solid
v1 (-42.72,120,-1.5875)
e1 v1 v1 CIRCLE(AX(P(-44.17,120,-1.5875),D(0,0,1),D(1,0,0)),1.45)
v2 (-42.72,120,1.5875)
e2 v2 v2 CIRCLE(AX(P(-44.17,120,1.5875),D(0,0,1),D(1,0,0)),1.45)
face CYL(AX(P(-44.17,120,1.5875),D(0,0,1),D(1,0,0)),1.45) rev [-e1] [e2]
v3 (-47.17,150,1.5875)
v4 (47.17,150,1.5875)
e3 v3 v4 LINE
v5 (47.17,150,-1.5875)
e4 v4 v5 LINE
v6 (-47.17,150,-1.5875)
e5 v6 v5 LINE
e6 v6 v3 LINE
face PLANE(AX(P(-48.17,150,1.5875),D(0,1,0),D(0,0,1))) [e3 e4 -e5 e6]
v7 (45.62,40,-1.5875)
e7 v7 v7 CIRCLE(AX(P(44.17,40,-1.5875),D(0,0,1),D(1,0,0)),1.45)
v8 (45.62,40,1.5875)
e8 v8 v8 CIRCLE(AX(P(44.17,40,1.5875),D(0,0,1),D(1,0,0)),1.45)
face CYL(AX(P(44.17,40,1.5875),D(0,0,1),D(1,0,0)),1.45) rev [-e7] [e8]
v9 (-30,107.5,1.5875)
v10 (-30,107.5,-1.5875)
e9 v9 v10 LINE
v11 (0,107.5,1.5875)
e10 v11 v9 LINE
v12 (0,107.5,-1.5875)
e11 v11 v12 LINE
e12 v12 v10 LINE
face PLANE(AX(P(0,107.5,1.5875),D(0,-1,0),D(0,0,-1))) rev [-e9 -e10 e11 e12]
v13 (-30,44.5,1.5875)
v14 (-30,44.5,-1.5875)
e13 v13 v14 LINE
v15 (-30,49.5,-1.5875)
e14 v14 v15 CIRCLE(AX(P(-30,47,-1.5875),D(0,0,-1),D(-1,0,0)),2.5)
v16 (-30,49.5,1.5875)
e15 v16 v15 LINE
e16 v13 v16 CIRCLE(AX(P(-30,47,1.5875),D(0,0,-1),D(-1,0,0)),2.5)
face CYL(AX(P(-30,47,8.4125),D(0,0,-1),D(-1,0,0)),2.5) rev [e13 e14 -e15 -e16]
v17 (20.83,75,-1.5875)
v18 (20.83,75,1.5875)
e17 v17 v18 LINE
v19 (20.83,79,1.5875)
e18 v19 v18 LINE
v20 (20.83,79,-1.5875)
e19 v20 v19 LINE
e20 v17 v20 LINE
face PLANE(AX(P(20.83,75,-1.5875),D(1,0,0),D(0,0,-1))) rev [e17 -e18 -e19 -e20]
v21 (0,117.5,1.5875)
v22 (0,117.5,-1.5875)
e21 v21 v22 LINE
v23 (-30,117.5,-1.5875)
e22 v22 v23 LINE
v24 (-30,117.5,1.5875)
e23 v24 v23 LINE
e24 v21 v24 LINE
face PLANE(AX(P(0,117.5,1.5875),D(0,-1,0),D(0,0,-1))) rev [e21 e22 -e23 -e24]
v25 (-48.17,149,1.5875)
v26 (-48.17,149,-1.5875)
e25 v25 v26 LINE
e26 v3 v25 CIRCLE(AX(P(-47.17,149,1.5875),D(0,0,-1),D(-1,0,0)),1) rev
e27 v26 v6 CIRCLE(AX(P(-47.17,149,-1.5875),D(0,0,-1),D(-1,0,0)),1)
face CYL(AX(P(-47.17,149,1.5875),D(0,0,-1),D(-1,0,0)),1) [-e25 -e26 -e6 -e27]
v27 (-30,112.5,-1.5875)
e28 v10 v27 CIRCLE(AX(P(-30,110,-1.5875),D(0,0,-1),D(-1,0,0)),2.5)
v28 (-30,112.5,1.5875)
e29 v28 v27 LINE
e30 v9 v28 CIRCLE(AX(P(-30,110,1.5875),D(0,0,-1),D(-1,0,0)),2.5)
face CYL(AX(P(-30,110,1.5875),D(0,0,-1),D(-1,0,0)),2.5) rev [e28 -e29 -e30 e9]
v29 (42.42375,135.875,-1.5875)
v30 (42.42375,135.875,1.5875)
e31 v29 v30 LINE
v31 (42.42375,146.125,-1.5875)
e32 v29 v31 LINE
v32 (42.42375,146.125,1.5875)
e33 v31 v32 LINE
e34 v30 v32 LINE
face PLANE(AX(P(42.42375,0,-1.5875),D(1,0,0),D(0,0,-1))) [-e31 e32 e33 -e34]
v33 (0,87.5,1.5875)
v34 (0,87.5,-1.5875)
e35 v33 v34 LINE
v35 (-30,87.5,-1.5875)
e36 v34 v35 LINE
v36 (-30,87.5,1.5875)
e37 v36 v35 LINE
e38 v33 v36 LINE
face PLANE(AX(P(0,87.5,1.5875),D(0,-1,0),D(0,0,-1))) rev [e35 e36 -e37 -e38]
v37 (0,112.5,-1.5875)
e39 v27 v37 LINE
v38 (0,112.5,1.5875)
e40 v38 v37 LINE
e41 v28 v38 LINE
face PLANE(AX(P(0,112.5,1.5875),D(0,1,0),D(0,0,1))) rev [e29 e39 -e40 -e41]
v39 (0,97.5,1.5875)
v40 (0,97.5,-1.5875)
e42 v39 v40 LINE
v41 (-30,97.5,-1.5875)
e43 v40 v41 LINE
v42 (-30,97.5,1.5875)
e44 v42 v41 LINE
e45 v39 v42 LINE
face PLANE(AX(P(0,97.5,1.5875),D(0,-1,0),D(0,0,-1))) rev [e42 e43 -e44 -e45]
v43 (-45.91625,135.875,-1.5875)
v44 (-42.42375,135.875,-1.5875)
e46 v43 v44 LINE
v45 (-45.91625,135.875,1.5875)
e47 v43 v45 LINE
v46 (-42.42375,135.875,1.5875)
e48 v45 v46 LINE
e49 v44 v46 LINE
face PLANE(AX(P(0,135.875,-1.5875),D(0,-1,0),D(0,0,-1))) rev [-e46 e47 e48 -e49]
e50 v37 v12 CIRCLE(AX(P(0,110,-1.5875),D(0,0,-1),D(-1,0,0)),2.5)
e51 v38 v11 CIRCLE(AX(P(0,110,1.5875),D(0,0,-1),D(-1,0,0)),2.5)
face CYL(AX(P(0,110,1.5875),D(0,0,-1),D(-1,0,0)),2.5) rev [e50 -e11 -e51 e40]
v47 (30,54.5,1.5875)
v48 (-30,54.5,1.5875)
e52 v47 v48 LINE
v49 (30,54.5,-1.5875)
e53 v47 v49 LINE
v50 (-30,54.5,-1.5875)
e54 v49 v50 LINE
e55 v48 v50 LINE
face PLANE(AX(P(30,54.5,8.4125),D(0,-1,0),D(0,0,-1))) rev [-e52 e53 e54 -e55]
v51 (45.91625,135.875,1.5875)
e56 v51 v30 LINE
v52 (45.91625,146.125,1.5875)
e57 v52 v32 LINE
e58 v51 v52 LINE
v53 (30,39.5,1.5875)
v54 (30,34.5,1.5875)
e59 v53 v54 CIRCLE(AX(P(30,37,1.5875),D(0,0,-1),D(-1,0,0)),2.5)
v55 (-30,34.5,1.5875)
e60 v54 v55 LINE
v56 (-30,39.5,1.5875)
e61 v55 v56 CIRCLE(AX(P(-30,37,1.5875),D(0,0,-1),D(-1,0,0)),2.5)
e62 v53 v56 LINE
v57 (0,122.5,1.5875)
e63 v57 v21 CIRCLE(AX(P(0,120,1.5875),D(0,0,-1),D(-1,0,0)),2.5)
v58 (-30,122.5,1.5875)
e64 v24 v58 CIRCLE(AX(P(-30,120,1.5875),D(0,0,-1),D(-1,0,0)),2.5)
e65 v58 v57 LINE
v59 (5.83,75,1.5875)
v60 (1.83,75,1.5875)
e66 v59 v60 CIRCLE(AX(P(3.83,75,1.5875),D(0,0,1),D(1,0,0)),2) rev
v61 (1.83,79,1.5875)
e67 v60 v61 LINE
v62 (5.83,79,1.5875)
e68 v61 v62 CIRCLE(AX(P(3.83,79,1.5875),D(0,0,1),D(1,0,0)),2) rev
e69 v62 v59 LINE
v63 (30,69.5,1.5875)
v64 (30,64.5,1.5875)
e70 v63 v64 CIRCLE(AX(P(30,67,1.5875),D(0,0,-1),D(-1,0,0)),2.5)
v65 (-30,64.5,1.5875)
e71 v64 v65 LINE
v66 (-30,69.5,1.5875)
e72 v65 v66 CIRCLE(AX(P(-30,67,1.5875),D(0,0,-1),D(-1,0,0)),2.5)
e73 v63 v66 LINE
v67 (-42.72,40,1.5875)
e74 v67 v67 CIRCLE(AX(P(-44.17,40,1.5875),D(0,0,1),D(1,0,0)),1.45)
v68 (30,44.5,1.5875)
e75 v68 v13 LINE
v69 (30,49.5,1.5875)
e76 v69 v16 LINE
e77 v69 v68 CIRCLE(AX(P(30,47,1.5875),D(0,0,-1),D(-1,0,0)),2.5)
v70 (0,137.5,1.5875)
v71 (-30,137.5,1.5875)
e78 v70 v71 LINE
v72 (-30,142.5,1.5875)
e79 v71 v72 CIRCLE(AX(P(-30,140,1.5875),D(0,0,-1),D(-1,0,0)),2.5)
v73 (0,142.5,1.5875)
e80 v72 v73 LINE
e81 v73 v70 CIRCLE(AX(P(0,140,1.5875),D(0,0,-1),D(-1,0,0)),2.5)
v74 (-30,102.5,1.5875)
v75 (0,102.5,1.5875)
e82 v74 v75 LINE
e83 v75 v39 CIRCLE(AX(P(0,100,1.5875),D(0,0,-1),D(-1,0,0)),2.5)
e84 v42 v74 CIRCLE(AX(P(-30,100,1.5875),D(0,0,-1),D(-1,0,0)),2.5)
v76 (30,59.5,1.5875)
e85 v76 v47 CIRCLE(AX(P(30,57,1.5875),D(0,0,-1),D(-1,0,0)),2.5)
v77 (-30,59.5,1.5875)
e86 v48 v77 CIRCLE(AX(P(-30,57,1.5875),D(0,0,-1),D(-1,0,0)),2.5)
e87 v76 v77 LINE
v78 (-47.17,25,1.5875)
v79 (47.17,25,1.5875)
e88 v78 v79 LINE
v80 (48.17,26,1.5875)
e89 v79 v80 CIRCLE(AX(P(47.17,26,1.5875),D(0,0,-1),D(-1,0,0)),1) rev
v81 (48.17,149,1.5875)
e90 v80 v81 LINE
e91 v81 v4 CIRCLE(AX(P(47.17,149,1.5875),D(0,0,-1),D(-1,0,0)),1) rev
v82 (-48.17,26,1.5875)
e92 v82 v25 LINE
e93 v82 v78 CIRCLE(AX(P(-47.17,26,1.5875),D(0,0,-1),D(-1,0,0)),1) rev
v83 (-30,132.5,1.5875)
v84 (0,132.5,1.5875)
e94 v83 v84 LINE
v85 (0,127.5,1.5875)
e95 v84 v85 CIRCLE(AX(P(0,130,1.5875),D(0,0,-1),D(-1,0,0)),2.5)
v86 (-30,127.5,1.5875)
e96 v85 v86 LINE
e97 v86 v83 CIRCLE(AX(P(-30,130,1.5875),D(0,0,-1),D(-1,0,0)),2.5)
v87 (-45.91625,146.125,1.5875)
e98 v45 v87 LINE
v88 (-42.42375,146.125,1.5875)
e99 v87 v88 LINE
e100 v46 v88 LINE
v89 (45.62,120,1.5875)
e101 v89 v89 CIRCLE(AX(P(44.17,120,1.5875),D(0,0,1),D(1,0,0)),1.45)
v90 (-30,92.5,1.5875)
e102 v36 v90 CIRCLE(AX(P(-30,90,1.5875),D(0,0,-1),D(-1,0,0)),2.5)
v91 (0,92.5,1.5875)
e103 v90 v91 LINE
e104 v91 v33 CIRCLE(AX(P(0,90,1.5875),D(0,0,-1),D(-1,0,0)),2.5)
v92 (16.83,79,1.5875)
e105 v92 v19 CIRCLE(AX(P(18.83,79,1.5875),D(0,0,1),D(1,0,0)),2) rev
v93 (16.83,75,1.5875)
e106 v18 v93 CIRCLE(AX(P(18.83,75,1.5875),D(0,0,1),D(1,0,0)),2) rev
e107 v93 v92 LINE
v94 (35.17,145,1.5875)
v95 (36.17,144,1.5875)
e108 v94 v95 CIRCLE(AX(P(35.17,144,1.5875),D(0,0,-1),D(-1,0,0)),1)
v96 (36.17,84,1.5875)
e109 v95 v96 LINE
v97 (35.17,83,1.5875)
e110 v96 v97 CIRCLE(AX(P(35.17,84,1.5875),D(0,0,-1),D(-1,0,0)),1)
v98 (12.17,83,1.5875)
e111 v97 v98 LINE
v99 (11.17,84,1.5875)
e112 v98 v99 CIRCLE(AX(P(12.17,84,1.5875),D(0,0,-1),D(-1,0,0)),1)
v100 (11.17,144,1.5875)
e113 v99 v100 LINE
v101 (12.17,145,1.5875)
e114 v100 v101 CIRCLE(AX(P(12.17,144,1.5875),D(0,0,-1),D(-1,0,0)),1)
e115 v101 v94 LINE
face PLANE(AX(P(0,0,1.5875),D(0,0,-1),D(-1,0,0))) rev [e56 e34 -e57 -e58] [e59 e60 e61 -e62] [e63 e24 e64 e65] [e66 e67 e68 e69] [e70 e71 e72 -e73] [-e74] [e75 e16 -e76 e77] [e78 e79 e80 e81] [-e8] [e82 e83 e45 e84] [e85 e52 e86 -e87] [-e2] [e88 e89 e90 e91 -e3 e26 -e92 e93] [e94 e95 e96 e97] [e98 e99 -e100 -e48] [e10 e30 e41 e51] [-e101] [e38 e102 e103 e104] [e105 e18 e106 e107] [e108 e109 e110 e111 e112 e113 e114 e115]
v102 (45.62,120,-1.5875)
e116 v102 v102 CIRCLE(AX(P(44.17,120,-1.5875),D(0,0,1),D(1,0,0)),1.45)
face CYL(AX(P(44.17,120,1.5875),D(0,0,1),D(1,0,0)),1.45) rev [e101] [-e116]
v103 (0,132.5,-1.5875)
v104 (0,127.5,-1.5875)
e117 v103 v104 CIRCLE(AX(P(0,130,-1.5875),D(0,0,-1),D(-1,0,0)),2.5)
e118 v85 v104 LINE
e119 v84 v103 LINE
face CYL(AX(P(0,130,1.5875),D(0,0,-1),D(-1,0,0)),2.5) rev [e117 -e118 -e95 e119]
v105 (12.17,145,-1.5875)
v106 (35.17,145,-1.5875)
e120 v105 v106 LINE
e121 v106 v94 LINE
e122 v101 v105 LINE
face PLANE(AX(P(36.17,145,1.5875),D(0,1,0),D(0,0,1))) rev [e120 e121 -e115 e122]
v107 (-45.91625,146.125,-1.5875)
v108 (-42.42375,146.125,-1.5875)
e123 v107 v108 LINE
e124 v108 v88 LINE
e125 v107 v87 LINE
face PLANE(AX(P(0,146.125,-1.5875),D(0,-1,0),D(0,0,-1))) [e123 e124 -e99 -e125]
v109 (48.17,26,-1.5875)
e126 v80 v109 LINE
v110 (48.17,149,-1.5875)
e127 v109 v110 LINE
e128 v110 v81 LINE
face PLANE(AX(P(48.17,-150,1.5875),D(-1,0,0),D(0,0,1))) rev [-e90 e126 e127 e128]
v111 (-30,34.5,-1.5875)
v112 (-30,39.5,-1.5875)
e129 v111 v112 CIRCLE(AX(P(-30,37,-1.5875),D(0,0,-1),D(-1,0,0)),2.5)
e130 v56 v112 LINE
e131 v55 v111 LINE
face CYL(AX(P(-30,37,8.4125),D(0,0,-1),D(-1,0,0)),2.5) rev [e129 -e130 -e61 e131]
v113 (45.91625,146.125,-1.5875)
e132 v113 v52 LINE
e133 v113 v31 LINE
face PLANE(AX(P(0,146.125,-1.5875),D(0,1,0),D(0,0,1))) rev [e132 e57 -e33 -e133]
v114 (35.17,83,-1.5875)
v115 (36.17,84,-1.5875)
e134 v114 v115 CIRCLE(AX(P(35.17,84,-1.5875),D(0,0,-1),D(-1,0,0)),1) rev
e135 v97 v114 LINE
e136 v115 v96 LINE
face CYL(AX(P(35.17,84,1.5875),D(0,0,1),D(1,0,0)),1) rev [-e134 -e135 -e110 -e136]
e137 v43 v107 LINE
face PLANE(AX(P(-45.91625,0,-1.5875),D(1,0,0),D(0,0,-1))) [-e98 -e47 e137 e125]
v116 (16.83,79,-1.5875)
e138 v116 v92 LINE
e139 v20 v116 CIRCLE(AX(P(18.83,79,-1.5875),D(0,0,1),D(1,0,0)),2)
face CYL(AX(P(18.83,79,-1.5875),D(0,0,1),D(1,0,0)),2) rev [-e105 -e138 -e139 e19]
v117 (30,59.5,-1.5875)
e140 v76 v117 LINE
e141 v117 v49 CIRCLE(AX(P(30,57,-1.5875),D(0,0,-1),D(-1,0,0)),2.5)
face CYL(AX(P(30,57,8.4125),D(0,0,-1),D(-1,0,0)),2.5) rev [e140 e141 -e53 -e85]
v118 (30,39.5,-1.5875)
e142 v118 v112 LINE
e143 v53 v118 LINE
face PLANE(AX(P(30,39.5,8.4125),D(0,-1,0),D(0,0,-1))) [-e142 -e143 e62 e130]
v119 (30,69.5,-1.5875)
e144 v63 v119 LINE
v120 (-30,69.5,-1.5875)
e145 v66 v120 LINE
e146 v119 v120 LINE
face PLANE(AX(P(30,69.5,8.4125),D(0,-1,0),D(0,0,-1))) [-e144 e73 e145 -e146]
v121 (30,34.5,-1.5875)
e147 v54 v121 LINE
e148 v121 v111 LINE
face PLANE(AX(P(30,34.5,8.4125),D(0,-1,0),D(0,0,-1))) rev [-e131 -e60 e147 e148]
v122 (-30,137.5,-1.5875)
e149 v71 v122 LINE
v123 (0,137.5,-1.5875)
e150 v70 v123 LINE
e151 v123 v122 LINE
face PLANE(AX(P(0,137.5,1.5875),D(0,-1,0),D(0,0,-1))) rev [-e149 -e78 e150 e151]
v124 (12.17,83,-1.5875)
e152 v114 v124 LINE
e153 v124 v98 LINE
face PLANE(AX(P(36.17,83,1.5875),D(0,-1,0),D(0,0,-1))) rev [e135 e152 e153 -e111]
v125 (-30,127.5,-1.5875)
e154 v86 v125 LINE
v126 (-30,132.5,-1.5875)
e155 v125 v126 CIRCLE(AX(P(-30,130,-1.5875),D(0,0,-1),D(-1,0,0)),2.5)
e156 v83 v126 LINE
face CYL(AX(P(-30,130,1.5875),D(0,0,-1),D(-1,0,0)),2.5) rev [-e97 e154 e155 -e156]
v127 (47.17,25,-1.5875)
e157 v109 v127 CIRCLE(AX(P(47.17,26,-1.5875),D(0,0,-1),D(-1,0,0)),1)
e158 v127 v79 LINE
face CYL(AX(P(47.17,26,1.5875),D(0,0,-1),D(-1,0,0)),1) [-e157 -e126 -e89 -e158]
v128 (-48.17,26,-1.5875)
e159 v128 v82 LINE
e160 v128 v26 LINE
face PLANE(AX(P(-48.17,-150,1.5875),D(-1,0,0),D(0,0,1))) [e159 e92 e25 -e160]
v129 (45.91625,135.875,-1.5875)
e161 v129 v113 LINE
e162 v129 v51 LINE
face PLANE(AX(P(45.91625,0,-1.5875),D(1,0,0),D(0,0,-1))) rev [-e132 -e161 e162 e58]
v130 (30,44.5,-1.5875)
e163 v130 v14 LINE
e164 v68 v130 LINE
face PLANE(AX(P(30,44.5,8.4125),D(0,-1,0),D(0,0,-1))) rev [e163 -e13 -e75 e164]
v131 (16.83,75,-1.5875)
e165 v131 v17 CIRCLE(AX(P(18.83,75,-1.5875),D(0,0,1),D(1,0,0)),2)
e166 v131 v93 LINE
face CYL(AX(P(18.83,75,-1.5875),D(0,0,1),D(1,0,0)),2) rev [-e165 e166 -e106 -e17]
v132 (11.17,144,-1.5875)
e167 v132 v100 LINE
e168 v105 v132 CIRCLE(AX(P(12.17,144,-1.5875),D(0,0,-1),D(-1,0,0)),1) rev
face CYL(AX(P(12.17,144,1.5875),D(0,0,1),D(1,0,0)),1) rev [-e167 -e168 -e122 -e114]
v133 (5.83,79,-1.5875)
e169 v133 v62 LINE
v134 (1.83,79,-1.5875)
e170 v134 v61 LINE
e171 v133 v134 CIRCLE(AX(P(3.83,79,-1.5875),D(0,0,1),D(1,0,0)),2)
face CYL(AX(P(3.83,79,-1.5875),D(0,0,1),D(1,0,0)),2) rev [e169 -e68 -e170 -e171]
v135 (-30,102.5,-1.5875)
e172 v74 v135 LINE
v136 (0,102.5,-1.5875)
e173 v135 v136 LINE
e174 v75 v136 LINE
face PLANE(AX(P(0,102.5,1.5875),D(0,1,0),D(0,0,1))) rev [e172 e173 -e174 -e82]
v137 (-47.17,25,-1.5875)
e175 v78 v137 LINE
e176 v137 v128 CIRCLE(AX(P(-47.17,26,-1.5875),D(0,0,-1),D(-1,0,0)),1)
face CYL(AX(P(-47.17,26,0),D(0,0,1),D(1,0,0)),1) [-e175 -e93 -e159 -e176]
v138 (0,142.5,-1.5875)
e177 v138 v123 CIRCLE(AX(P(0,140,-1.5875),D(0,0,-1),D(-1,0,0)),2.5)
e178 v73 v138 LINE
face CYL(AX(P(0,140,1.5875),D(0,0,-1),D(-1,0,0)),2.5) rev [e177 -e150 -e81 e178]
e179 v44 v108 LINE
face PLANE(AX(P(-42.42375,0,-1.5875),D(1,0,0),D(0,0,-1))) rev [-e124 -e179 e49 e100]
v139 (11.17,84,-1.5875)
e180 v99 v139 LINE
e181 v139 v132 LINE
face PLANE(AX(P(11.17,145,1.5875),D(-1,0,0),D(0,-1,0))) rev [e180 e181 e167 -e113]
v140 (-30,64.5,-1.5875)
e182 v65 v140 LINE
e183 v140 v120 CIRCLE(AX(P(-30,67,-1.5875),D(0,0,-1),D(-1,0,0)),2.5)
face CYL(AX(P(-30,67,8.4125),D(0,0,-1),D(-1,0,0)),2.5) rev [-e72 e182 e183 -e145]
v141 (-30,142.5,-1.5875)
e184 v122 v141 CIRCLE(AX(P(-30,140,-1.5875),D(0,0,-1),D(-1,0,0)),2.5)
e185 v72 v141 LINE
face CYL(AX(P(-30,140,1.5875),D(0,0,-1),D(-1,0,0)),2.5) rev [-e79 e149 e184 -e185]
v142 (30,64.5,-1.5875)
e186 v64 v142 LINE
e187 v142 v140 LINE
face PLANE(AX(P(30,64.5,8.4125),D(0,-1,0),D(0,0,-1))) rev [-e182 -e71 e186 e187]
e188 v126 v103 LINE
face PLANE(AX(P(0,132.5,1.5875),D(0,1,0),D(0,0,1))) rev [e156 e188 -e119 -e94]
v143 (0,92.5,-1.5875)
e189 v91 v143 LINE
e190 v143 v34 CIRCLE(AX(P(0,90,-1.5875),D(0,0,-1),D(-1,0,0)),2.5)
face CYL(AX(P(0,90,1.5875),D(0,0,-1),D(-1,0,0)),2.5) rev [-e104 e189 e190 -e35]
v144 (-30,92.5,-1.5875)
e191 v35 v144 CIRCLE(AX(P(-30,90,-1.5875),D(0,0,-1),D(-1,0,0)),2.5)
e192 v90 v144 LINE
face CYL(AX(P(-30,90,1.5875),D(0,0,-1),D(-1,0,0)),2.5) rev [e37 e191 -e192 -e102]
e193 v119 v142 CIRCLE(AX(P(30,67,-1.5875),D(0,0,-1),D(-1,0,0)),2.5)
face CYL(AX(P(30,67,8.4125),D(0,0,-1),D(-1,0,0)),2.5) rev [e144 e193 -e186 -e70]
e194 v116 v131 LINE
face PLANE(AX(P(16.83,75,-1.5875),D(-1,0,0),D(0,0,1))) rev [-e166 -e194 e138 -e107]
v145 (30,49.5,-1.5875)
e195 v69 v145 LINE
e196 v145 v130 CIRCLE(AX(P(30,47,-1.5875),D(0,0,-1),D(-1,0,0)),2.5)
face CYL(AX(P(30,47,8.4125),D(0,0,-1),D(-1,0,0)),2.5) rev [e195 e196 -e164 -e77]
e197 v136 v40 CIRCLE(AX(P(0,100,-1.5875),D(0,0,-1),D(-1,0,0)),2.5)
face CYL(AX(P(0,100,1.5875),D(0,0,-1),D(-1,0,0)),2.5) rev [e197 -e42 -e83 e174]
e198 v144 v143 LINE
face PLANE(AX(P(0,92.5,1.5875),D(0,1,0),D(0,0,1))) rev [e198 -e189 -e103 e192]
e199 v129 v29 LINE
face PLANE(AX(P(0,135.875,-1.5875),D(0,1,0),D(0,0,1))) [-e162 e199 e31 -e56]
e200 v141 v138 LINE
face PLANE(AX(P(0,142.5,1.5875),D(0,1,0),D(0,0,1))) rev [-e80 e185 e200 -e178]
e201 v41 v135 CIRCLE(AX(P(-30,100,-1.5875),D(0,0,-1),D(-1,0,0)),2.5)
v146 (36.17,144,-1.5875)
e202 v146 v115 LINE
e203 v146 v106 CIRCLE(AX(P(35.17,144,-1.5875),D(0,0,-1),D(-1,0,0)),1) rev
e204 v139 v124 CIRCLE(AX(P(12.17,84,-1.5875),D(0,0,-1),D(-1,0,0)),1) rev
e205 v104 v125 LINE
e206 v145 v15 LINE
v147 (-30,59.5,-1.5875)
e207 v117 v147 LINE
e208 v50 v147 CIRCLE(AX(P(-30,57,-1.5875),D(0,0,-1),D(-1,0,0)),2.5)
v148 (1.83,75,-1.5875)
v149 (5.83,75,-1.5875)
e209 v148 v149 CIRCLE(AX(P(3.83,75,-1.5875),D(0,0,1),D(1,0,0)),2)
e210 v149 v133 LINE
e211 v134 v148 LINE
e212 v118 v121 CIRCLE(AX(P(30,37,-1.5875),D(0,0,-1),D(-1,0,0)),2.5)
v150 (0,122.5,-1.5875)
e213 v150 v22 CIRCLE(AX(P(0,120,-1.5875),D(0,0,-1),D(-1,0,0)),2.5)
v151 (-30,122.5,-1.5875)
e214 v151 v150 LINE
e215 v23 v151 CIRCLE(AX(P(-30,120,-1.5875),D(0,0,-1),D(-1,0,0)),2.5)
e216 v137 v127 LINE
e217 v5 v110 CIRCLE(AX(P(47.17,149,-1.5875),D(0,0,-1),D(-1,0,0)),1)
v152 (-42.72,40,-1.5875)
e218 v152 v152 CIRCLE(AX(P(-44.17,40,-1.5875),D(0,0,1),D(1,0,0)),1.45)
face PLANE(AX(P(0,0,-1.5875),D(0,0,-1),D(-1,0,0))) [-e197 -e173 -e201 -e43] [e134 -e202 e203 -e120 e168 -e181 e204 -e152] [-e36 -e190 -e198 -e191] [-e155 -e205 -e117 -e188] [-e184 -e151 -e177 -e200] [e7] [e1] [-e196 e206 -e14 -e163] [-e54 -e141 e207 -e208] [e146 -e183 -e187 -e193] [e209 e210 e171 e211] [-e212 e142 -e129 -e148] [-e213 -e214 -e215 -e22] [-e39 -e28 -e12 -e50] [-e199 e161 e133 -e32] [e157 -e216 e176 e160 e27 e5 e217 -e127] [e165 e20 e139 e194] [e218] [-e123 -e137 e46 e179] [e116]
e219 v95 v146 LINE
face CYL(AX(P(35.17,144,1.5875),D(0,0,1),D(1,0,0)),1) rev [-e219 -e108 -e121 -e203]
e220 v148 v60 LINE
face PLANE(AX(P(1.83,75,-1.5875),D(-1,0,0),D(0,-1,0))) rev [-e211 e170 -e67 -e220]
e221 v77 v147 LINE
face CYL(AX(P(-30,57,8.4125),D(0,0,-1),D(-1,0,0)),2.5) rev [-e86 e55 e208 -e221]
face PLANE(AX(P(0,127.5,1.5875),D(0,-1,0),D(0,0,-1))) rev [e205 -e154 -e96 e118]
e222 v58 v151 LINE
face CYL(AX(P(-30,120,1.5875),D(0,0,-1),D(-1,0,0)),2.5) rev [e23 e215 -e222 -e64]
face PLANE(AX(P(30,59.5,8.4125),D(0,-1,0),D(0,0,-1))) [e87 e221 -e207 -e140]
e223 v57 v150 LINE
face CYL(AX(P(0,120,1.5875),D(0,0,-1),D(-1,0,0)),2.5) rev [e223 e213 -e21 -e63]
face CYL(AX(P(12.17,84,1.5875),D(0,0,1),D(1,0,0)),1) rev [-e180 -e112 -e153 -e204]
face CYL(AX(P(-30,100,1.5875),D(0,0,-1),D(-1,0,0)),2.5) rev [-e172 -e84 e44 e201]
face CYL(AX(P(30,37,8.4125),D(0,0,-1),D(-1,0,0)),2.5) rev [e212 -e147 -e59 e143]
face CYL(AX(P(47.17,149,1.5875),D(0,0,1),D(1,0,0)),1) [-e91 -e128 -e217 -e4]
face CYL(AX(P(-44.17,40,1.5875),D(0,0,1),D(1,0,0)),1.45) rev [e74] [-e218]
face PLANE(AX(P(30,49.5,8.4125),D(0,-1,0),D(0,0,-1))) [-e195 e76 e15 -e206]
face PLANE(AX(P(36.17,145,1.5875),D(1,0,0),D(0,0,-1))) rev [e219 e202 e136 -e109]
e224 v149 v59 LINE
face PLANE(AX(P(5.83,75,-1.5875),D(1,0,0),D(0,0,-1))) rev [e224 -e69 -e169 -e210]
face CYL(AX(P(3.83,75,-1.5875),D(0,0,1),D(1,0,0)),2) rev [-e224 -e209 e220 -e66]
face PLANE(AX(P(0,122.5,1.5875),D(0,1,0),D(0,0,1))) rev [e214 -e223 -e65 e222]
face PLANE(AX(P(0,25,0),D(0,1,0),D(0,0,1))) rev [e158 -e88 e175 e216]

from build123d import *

# Parameters (mm, degrees)
STOCK_TORSO_REAR_PLATE_1_START       = -1.5875
STOCK_TORSO_REAR_PLATE_1_OUTLINE_W   = 96.34
STOCK_TORSO_REAR_PLATE_1_OUTLINE_H   = 125.5
STOCK_TORSO_REAR_PLATE_1_OUTLINE_R   = 1.45
STOCK_TORSO_REAR_PLATE_1_OUTLINE_W_2 = 3.4925
STOCK_TORSO_REAR_PLATE_1_OUTLINE_H_2 = 10.25
STOCK_TORSO_REAR_PLATE_1_DEPTH       = 3.175
MOVE_FACE1_BY                        = 0.5
CUT_EXTRUDE1_DEPTH                   = 158.576741701
CUT_EXTRUDE1_DEPTH_BACK              = 158.576741701
CUT_EXTRUDE2_DEPTH                   = 158.576741701
CUT_EXTRUDE2_DEPTH_BACK              = 158.576741701
SKETCH2_W                            = 25
SKETCH2_H                            = 62
FILLET1_R                            = 1
CUT_EXTRUDE3_DEPTH                   = 158.576741701
CUT_EXTRUDE3_DEPTH_BACK              = 158.576741701
FILLET2_R                            = 1


# Read off the part's stored shape, not the designer's step: Stock-torso_rear_plate-1
with BuildPart() as part:
    # Stock-torso_rear_plate-1 outline → Stock-torso_rear_plate-1 (new body)
    with BuildSketch(Plane.XY.offset(STOCK_TORSO_REAR_PLATE_1_START)):
        with Locations((0, 87.25)):
            Rectangle(STOCK_TORSO_REAR_PLATE_1_OUTLINE_W, STOCK_TORSO_REAR_PLATE_1_OUTLINE_H)
        with Locations((-44.17, 40)):
            Circle(STOCK_TORSO_REAR_PLATE_1_OUTLINE_R, mode=Mode.SUBTRACT)
        with BuildLine():
            Line((30, 34.5), (-30, 34.5))
            ThreePointArc((-30, 34.5), (-32.5, 37), (-30, 39.5))
            Line((-30, 39.5), (30, 39.5))
            ThreePointArc((30, 39.5), (32.5, 37), (30, 34.5))
        make_face(mode=Mode.SUBTRACT)
        with BuildLine():
            Line((30, 44.5), (-30, 44.5))
            ThreePointArc((-30, 44.5), (-32.5, 47), (-30, 49.5))
            Line((-30, 49.5), (30, 49.5))
            ThreePointArc((30, 49.5), (32.5, 47), (30, 44.5))
        make_face(mode=Mode.SUBTRACT)
        with Locations((44.17, 40)):
            Circle(STOCK_TORSO_REAR_PLATE_1_OUTLINE_R, mode=Mode.SUBTRACT)
        with BuildLine():
            ThreePointArc((-30, 54.5), (-32.5, 57), (-30, 59.5))
            Line((-30, 59.5), (30, 59.5))
            ThreePointArc((30, 59.5), (32.5, 57), (30, 54.5))
            Line((30, 54.5), (-30, 54.5))
        make_face(mode=Mode.SUBTRACT)
        with BuildLine():
            ThreePointArc((-30, 64.5), (-32.5, 67), (-30, 69.5))
            Line((-30, 69.5), (30, 69.5))
            ThreePointArc((30, 69.5), (32.5, 67), (30, 64.5))
            Line((30, 64.5), (-30, 64.5))
        make_face(mode=Mode.SUBTRACT)
        with Locations((-44.17, 120)):
            Circle(STOCK_TORSO_REAR_PLATE_1_OUTLINE_R, mode=Mode.SUBTRACT)
        with Locations((-44.17, 141)):
            Rectangle(STOCK_TORSO_REAR_PLATE_1_OUTLINE_W_2, STOCK_TORSO_REAR_PLATE_1_OUTLINE_H_2, mode=Mode.SUBTRACT)
        with Locations((44.17, 120)):
            Circle(STOCK_TORSO_REAR_PLATE_1_OUTLINE_R, mode=Mode.SUBTRACT)
        with Locations((44.17, 141)):
            Rectangle(STOCK_TORSO_REAR_PLATE_1_OUTLINE_W_2, STOCK_TORSO_REAR_PLATE_1_OUTLINE_H_2, mode=Mode.SUBTRACT)
    extrude(amount=STOCK_TORSO_REAR_PLATE_1_DEPTH)

    # Move Face1: a face moved inward by 0.5
    extrude(part.faces().sort_by_distance((0, 24.5, 0))[0], amount=MOVE_FACE1_BY, dir=(0, 1, 0), mode=Mode.SUBTRACT)

    # Sketch1 → Cut-Extrude1 (cut, two sides: drawn at the far end of the back side and taken through both)
    with BuildSketch(Plane.XY.offset(1.5875).offset(-CUT_EXTRUDE1_DEPTH_BACK)):
        with BuildLine():
            Line((1.83, 75), (1.83, 79))
            ThreePointArc((1.83, 79), (3.83, 81), (5.83, 79))
            Line((5.83, 79), (5.83, 75))
            ThreePointArc((5.83, 75), (3.83, 73), (1.83, 75))
        make_face()
        with BuildLine():
            Line((16.83, 75), (16.83, 79))
            ThreePointArc((16.83, 79), (18.83, 81), (20.83, 79))
            Line((20.83, 79), (20.83, 75))
            ThreePointArc((20.83, 75), (18.83, 73), (16.83, 75))
        make_face()
    extrude(amount=CUT_EXTRUDE1_DEPTH + CUT_EXTRUDE1_DEPTH_BACK, mode=Mode.SUBTRACT)

    # Sketch2 → Cut-Extrude2 (cut, two sides: drawn at the far end of the back side and taken through both)
    with BuildSketch(Plane(origin=(0, 0, -1.5875), x_dir=(-1, 0, 0), z_dir=(0, 0, -1)).offset(-CUT_EXTRUDE2_DEPTH_BACK)):
        with Locations((-23.67, 114)):
            Rectangle(SKETCH2_W, SKETCH2_H)
    extrude(amount=CUT_EXTRUDE2_DEPTH + CUT_EXTRUDE2_DEPTH_BACK, mode=Mode.SUBTRACT)

    # Fillet1
    fillet1_edges = [part.edges().sort_by_distance(p)[0] for p in [
        (36.17, 83, 0),
        (36.17, 145, 0),
        (11.17, 145, 0),
        (11.17, 83, 0),
    ]]
    fillet(fillet1_edges, radius=FILLET1_R)

    # Sketch3 → Cut-Extrude3 (cut, two sides: drawn at the far end of the back side and taken through both)
    with BuildSketch(Plane(origin=(0, 0, -1.5875), x_dir=(-1, 0, 0), z_dir=(0, 0, -1)).offset(-CUT_EXTRUDE3_DEPTH_BACK)):
        with BuildLine():
            Line((0, 92.5), (30, 92.5))
            ThreePointArc((30, 92.5), (32.5, 90), (30, 87.5))
            Line((30, 87.5), (0, 87.5))
            ThreePointArc((0, 87.5), (-2.5, 90), (0, 92.5))
        make_face()
        with BuildLine():
            Line((0, 102.5), (30, 102.5))
            ThreePointArc((30, 102.5), (32.5, 100), (30, 97.5))
            Line((30, 97.5), (0, 97.5))
            ThreePointArc((0, 97.5), (-2.5, 100), (0, 102.5))
        make_face()
        with BuildLine():
            Line((0, 112.5), (30, 112.5))
            ThreePointArc((30, 112.5), (32.5, 110), (30, 107.5))
            Line((30, 107.5), (0, 107.5))
            ThreePointArc((0, 107.5), (-2.5, 110), (0, 112.5))
        make_face()
        with BuildLine():
            Line((0, 122.5), (30, 122.5))
            ThreePointArc((30, 122.5), (32.5, 120), (30, 117.5))
            Line((30, 117.5), (0, 117.5))
            ThreePointArc((0, 117.5), (-2.5, 120), (0, 122.5))
        make_face()
        with BuildLine():
            Line((0, 132.5), (30, 132.5))
            ThreePointArc((30, 132.5), (32.5, 130), (30, 127.5))
            Line((30, 127.5), (0, 127.5))
            ThreePointArc((0, 127.5), (-2.5, 130), (0, 132.5))
        make_face()
        with BuildLine():
            Line((0, 142.5), (30, 142.5))
            ThreePointArc((30, 142.5), (32.5, 140), (30, 137.5))
            Line((30, 137.5), (0, 137.5))
            ThreePointArc((0, 137.5), (-2.5, 140), (0, 142.5))
        make_face()
    extrude(amount=CUT_EXTRUDE3_DEPTH + CUT_EXTRUDE3_DEPTH_BACK, mode=Mode.SUBTRACT)

    # Fillet2
    fillet2_edges = [part.edges().sort_by_distance(p)[0] for p in [
        (48.17, 25, 0),
        (-48.17, 25, 0),
        (48.17, 150, 0),
        (-48.17, 150, 0),
    ]]
    fillet(fillet2_edges, radius=FILLET2_R)


solid = part.part
